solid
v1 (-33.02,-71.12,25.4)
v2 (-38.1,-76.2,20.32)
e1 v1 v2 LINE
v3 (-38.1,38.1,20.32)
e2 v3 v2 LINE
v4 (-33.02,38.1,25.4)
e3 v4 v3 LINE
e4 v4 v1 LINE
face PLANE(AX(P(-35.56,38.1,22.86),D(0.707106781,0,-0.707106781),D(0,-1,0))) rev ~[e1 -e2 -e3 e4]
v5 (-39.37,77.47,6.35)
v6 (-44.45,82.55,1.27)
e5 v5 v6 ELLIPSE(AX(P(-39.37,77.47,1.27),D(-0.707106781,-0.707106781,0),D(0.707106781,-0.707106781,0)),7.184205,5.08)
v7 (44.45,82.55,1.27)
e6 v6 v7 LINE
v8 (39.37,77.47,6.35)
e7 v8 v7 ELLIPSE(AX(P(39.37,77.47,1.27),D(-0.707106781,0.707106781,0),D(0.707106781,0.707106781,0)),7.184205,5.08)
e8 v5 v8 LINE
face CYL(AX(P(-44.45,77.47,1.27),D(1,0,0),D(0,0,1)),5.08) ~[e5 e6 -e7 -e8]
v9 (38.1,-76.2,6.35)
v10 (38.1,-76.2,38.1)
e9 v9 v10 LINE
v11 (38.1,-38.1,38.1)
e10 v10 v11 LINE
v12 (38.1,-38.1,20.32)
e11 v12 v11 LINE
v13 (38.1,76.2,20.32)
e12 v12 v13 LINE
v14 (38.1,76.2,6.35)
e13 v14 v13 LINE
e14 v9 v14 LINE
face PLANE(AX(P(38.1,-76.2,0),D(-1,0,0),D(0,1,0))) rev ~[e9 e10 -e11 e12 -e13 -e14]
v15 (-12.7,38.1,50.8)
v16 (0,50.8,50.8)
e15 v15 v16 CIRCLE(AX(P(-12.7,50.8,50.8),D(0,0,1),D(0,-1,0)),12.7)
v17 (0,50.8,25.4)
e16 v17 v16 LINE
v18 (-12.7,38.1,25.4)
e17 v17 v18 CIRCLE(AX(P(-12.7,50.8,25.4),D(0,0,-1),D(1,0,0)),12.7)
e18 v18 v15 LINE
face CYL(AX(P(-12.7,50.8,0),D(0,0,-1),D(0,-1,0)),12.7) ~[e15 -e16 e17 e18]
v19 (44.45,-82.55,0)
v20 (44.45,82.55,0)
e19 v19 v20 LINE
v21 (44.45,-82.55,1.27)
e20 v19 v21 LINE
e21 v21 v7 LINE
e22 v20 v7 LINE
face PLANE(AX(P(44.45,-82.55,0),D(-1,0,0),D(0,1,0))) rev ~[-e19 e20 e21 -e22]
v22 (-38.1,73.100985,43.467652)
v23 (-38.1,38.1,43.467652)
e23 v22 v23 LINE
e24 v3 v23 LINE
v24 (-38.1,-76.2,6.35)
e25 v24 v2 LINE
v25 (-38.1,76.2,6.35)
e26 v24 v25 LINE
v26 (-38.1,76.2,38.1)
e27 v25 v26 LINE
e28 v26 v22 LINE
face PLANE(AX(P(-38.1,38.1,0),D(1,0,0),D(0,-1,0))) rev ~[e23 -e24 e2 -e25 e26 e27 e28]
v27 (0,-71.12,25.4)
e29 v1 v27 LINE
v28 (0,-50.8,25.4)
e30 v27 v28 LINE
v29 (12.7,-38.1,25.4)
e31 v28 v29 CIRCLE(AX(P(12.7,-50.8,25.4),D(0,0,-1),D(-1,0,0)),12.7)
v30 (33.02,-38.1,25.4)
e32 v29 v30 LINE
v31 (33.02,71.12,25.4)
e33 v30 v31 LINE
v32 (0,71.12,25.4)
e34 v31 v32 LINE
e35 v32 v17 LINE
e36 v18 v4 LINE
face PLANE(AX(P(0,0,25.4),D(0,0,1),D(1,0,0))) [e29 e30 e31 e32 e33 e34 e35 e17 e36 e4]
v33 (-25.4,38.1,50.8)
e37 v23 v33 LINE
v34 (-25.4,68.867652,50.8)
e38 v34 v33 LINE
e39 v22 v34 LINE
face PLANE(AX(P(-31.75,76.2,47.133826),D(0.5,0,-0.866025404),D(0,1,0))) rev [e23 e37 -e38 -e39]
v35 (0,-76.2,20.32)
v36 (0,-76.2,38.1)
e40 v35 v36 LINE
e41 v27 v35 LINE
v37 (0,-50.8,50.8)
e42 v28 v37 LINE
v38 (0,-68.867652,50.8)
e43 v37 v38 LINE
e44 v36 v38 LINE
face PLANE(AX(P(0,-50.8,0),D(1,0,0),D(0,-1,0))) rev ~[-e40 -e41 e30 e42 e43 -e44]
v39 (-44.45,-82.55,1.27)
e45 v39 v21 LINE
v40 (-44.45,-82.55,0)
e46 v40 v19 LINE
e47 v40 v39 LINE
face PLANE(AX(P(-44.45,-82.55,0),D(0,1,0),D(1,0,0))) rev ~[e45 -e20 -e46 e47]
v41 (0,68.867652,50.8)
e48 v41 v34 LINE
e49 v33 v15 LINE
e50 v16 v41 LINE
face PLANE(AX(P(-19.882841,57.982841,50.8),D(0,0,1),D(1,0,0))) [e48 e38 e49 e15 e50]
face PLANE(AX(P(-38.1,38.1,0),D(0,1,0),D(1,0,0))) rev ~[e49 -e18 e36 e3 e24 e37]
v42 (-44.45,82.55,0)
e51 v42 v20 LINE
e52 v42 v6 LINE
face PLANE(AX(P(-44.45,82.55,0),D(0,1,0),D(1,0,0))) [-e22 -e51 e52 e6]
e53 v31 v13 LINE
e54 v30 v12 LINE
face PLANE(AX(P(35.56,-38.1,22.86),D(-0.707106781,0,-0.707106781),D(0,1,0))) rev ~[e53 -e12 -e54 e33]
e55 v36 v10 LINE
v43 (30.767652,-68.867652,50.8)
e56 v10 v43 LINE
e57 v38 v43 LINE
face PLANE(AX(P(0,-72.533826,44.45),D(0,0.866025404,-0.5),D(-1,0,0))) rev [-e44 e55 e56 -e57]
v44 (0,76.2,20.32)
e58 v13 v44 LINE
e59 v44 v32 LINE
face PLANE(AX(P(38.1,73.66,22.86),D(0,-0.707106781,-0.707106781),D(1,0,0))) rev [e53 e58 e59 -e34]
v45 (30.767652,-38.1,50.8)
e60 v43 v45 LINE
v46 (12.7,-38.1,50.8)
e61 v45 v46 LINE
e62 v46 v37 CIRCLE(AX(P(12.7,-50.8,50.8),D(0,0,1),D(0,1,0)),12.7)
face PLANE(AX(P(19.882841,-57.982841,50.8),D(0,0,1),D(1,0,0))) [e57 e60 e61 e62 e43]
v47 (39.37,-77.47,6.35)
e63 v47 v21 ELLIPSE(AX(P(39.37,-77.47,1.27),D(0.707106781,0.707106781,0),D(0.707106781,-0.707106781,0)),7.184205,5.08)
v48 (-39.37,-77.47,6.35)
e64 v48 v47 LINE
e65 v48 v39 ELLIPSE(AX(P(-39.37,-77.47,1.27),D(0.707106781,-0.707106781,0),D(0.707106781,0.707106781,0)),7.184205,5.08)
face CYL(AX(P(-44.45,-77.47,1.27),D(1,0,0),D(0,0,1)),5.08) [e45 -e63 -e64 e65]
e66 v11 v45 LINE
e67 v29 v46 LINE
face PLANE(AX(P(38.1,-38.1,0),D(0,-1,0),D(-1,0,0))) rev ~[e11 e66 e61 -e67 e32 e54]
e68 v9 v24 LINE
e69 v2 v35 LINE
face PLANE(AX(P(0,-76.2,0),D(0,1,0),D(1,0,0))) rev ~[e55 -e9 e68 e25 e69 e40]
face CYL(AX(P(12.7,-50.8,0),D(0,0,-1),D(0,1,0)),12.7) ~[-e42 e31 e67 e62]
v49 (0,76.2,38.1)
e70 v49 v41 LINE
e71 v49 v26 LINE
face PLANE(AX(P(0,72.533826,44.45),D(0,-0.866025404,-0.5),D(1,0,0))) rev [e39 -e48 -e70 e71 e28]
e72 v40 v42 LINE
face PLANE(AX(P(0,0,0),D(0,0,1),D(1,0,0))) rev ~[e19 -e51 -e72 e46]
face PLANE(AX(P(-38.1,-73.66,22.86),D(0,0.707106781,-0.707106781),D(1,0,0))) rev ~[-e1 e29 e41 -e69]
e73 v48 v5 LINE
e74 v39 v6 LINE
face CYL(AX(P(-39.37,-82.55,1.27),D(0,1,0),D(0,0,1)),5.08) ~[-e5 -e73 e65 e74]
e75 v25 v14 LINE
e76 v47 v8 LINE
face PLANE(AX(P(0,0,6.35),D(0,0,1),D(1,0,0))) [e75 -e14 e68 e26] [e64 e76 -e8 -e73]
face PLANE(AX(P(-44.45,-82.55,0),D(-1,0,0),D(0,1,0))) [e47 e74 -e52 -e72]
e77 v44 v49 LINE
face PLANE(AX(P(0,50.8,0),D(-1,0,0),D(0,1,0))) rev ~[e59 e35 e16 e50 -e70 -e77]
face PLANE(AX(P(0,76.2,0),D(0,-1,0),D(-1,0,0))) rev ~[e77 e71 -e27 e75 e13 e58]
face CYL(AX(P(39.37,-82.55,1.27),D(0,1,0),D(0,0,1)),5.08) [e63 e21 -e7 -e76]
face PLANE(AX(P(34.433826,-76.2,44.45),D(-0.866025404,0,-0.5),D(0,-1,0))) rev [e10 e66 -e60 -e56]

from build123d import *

# Parameters (mm, degrees)
F0_W        = 88.9
F0_H        = 165.1
F1_DEPTH    = 6.35
F2_DEPTH    = 25.4
F3_SIZE     = 5.08
F4_DEPTH    = 50.8
F5_R        = 5.08
F6_C1_SIZE2 = 12.7
F6_C1_SIZE  = 7.3323484187
F6_C2_SIZE2 = 7.3323484187
F6_C2_SIZE  = 12.7
F6_C3_SIZE2 = 7.3323484187
F6_C3_SIZE  = 12.7
F6_C4_SIZE2 = 7.3323484187
F6_C4_SIZE  = 12.7


with BuildPart() as f1:
    # F0 (on Top) → F1 (new body)
    with BuildSketch(Plane.XY):
        Rectangle(F0_W, F0_H)
        Polygon((-38.1, 38.1), (-38.1, 76.2), (0, 76.2), (38.1, 76.2), (38.1, -38.1), (38.1, -76.2), (0, -76.2), (-38.1, -76.2), align=None, mode=Mode.SUBTRACT)
    extrude(amount=F1_DEPTH)

    # F0 (on Top) → F2 (join)
    with BuildSketch(Plane.XY):
        with BuildLine():
            Line((38.1, 76.2), (0, 76.2))
            Line((0, 76.2), (0, 50.8))
            ThreePointArc((0, 50.8), (-3.7197438789, 41.8197438789), (-12.7, 38.1))
            Line((-12.7, 38.1), (-38.1, 38.1))
            Line((-38.1, 38.1), (-38.1, -76.2))
            Line((-38.1, -76.2), (0, -76.2))
            Line((0, -76.2), (0, -50.8))
            ThreePointArc((0, -50.8), (3.7197438789, -41.8197438789), (12.7, -38.1))
            Line((12.7, -38.1), (38.1, -38.1))
            Line((38.1, -38.1), (38.1, 76.2))
        make_face()
    extrude(amount=F2_DEPTH)

    # F3
    f3_edges = [f1.edges().sort_by_distance(p)[0] for p in [
        (-38.1, -19.05, 25.4),
        (-19.05, -76.2, 25.4),
        (38.1, 19.05, 25.4),
        (19.05, 76.2, 25.4),
    ]]
    chamfer(f3_edges, length=F3_SIZE)

    # F0 (on Top) → F4 (join)
    with BuildSketch(Plane.XY):
        with BuildLine():
            Line((38.1, -76.2), (38.1, -38.1))
            Line((38.1, -38.1), (12.7, -38.1))
            ThreePointArc((12.7, -38.1), (3.7197438789, -41.8197438789), (0, -50.8))
            Line((0, -50.8), (0, -76.2))
            Line((0, -76.2), (38.1, -76.2))
        make_face()
        with BuildLine():
            Line((0, 76.2), (-38.1, 76.2))
            Line((-38.1, 76.2), (-38.1, 38.1))
            Line((-38.1, 38.1), (-12.7, 38.1))
            ThreePointArc((-12.7, 38.1), (-3.7197438789, 41.8197438789), (0, 50.8))
            Line((0, 50.8), (0, 76.2))
        make_face()
    extrude(amount=F4_DEPTH)

    # F5
    f5_edges = [f1.edges().sort_by_distance(p)[0] for p in [
        (0, 82.55, 6.35),
        (-44.45, 0, 6.35),
        (0, -82.55, 6.35),
        (44.45, 0, 6.35),
    ]]
    fillet(f5_edges, radius=F5_R)

    # F6: chamfer of 12.7 x 7.3323484187 on 4 edges, made by hand

    # F6_c1
    f6_c1_edges = [f1.edges().sort_by_distance(p)[0] for p in [
        (-38.1, 57.15, 50.8),
    ]]
    f6_c1_side = f1.faces().sort_by_distance((-38.1, 57.15, 50.6533530316))[0]
    chamfer(f6_c1_edges, length=F6_C1_SIZE, length2=F6_C1_SIZE2, reference=f6_c1_side)

    # F6_c2
    f6_c2_edges = [f1.edges().sort_by_distance(p)[0] for p in [
        (-12.7, 76.2, 50.8),
    ]]
    f6_c2_side = f1.faces().sort_by_distance((-12.7, 76.2, 50.6533530316))[0]
    chamfer(f6_c2_edges, length=F6_C2_SIZE, length2=F6_C2_SIZE2, reference=f6_c2_side)

    # F6_c3
    f6_c3_edges = [f1.edges().sort_by_distance(p)[0] for p in [
        (38.1, -57.15, 50.8),
    ]]
    f6_c3_side = f1.faces().sort_by_distance((38.1, -57.15, 50.6533530316))[0]
    chamfer(f6_c3_edges, length=F6_C3_SIZE, length2=F6_C3_SIZE2, reference=f6_c3_side)

    # F6_c4
    f6_c4_edges = [f1.edges().sort_by_distance(p)[0] for p in [
        (15.3838257906, -76.2, 50.8),
    ]]
    f6_c4_side = f1.faces().sort_by_distance((15.3838257906, -76.2, 50.6533530316))[0]
    chamfer(f6_c4_edges, length=F6_C4_SIZE, length2=F6_C4_SIZE2, reference=f6_c4_side)


solid = f1.part
